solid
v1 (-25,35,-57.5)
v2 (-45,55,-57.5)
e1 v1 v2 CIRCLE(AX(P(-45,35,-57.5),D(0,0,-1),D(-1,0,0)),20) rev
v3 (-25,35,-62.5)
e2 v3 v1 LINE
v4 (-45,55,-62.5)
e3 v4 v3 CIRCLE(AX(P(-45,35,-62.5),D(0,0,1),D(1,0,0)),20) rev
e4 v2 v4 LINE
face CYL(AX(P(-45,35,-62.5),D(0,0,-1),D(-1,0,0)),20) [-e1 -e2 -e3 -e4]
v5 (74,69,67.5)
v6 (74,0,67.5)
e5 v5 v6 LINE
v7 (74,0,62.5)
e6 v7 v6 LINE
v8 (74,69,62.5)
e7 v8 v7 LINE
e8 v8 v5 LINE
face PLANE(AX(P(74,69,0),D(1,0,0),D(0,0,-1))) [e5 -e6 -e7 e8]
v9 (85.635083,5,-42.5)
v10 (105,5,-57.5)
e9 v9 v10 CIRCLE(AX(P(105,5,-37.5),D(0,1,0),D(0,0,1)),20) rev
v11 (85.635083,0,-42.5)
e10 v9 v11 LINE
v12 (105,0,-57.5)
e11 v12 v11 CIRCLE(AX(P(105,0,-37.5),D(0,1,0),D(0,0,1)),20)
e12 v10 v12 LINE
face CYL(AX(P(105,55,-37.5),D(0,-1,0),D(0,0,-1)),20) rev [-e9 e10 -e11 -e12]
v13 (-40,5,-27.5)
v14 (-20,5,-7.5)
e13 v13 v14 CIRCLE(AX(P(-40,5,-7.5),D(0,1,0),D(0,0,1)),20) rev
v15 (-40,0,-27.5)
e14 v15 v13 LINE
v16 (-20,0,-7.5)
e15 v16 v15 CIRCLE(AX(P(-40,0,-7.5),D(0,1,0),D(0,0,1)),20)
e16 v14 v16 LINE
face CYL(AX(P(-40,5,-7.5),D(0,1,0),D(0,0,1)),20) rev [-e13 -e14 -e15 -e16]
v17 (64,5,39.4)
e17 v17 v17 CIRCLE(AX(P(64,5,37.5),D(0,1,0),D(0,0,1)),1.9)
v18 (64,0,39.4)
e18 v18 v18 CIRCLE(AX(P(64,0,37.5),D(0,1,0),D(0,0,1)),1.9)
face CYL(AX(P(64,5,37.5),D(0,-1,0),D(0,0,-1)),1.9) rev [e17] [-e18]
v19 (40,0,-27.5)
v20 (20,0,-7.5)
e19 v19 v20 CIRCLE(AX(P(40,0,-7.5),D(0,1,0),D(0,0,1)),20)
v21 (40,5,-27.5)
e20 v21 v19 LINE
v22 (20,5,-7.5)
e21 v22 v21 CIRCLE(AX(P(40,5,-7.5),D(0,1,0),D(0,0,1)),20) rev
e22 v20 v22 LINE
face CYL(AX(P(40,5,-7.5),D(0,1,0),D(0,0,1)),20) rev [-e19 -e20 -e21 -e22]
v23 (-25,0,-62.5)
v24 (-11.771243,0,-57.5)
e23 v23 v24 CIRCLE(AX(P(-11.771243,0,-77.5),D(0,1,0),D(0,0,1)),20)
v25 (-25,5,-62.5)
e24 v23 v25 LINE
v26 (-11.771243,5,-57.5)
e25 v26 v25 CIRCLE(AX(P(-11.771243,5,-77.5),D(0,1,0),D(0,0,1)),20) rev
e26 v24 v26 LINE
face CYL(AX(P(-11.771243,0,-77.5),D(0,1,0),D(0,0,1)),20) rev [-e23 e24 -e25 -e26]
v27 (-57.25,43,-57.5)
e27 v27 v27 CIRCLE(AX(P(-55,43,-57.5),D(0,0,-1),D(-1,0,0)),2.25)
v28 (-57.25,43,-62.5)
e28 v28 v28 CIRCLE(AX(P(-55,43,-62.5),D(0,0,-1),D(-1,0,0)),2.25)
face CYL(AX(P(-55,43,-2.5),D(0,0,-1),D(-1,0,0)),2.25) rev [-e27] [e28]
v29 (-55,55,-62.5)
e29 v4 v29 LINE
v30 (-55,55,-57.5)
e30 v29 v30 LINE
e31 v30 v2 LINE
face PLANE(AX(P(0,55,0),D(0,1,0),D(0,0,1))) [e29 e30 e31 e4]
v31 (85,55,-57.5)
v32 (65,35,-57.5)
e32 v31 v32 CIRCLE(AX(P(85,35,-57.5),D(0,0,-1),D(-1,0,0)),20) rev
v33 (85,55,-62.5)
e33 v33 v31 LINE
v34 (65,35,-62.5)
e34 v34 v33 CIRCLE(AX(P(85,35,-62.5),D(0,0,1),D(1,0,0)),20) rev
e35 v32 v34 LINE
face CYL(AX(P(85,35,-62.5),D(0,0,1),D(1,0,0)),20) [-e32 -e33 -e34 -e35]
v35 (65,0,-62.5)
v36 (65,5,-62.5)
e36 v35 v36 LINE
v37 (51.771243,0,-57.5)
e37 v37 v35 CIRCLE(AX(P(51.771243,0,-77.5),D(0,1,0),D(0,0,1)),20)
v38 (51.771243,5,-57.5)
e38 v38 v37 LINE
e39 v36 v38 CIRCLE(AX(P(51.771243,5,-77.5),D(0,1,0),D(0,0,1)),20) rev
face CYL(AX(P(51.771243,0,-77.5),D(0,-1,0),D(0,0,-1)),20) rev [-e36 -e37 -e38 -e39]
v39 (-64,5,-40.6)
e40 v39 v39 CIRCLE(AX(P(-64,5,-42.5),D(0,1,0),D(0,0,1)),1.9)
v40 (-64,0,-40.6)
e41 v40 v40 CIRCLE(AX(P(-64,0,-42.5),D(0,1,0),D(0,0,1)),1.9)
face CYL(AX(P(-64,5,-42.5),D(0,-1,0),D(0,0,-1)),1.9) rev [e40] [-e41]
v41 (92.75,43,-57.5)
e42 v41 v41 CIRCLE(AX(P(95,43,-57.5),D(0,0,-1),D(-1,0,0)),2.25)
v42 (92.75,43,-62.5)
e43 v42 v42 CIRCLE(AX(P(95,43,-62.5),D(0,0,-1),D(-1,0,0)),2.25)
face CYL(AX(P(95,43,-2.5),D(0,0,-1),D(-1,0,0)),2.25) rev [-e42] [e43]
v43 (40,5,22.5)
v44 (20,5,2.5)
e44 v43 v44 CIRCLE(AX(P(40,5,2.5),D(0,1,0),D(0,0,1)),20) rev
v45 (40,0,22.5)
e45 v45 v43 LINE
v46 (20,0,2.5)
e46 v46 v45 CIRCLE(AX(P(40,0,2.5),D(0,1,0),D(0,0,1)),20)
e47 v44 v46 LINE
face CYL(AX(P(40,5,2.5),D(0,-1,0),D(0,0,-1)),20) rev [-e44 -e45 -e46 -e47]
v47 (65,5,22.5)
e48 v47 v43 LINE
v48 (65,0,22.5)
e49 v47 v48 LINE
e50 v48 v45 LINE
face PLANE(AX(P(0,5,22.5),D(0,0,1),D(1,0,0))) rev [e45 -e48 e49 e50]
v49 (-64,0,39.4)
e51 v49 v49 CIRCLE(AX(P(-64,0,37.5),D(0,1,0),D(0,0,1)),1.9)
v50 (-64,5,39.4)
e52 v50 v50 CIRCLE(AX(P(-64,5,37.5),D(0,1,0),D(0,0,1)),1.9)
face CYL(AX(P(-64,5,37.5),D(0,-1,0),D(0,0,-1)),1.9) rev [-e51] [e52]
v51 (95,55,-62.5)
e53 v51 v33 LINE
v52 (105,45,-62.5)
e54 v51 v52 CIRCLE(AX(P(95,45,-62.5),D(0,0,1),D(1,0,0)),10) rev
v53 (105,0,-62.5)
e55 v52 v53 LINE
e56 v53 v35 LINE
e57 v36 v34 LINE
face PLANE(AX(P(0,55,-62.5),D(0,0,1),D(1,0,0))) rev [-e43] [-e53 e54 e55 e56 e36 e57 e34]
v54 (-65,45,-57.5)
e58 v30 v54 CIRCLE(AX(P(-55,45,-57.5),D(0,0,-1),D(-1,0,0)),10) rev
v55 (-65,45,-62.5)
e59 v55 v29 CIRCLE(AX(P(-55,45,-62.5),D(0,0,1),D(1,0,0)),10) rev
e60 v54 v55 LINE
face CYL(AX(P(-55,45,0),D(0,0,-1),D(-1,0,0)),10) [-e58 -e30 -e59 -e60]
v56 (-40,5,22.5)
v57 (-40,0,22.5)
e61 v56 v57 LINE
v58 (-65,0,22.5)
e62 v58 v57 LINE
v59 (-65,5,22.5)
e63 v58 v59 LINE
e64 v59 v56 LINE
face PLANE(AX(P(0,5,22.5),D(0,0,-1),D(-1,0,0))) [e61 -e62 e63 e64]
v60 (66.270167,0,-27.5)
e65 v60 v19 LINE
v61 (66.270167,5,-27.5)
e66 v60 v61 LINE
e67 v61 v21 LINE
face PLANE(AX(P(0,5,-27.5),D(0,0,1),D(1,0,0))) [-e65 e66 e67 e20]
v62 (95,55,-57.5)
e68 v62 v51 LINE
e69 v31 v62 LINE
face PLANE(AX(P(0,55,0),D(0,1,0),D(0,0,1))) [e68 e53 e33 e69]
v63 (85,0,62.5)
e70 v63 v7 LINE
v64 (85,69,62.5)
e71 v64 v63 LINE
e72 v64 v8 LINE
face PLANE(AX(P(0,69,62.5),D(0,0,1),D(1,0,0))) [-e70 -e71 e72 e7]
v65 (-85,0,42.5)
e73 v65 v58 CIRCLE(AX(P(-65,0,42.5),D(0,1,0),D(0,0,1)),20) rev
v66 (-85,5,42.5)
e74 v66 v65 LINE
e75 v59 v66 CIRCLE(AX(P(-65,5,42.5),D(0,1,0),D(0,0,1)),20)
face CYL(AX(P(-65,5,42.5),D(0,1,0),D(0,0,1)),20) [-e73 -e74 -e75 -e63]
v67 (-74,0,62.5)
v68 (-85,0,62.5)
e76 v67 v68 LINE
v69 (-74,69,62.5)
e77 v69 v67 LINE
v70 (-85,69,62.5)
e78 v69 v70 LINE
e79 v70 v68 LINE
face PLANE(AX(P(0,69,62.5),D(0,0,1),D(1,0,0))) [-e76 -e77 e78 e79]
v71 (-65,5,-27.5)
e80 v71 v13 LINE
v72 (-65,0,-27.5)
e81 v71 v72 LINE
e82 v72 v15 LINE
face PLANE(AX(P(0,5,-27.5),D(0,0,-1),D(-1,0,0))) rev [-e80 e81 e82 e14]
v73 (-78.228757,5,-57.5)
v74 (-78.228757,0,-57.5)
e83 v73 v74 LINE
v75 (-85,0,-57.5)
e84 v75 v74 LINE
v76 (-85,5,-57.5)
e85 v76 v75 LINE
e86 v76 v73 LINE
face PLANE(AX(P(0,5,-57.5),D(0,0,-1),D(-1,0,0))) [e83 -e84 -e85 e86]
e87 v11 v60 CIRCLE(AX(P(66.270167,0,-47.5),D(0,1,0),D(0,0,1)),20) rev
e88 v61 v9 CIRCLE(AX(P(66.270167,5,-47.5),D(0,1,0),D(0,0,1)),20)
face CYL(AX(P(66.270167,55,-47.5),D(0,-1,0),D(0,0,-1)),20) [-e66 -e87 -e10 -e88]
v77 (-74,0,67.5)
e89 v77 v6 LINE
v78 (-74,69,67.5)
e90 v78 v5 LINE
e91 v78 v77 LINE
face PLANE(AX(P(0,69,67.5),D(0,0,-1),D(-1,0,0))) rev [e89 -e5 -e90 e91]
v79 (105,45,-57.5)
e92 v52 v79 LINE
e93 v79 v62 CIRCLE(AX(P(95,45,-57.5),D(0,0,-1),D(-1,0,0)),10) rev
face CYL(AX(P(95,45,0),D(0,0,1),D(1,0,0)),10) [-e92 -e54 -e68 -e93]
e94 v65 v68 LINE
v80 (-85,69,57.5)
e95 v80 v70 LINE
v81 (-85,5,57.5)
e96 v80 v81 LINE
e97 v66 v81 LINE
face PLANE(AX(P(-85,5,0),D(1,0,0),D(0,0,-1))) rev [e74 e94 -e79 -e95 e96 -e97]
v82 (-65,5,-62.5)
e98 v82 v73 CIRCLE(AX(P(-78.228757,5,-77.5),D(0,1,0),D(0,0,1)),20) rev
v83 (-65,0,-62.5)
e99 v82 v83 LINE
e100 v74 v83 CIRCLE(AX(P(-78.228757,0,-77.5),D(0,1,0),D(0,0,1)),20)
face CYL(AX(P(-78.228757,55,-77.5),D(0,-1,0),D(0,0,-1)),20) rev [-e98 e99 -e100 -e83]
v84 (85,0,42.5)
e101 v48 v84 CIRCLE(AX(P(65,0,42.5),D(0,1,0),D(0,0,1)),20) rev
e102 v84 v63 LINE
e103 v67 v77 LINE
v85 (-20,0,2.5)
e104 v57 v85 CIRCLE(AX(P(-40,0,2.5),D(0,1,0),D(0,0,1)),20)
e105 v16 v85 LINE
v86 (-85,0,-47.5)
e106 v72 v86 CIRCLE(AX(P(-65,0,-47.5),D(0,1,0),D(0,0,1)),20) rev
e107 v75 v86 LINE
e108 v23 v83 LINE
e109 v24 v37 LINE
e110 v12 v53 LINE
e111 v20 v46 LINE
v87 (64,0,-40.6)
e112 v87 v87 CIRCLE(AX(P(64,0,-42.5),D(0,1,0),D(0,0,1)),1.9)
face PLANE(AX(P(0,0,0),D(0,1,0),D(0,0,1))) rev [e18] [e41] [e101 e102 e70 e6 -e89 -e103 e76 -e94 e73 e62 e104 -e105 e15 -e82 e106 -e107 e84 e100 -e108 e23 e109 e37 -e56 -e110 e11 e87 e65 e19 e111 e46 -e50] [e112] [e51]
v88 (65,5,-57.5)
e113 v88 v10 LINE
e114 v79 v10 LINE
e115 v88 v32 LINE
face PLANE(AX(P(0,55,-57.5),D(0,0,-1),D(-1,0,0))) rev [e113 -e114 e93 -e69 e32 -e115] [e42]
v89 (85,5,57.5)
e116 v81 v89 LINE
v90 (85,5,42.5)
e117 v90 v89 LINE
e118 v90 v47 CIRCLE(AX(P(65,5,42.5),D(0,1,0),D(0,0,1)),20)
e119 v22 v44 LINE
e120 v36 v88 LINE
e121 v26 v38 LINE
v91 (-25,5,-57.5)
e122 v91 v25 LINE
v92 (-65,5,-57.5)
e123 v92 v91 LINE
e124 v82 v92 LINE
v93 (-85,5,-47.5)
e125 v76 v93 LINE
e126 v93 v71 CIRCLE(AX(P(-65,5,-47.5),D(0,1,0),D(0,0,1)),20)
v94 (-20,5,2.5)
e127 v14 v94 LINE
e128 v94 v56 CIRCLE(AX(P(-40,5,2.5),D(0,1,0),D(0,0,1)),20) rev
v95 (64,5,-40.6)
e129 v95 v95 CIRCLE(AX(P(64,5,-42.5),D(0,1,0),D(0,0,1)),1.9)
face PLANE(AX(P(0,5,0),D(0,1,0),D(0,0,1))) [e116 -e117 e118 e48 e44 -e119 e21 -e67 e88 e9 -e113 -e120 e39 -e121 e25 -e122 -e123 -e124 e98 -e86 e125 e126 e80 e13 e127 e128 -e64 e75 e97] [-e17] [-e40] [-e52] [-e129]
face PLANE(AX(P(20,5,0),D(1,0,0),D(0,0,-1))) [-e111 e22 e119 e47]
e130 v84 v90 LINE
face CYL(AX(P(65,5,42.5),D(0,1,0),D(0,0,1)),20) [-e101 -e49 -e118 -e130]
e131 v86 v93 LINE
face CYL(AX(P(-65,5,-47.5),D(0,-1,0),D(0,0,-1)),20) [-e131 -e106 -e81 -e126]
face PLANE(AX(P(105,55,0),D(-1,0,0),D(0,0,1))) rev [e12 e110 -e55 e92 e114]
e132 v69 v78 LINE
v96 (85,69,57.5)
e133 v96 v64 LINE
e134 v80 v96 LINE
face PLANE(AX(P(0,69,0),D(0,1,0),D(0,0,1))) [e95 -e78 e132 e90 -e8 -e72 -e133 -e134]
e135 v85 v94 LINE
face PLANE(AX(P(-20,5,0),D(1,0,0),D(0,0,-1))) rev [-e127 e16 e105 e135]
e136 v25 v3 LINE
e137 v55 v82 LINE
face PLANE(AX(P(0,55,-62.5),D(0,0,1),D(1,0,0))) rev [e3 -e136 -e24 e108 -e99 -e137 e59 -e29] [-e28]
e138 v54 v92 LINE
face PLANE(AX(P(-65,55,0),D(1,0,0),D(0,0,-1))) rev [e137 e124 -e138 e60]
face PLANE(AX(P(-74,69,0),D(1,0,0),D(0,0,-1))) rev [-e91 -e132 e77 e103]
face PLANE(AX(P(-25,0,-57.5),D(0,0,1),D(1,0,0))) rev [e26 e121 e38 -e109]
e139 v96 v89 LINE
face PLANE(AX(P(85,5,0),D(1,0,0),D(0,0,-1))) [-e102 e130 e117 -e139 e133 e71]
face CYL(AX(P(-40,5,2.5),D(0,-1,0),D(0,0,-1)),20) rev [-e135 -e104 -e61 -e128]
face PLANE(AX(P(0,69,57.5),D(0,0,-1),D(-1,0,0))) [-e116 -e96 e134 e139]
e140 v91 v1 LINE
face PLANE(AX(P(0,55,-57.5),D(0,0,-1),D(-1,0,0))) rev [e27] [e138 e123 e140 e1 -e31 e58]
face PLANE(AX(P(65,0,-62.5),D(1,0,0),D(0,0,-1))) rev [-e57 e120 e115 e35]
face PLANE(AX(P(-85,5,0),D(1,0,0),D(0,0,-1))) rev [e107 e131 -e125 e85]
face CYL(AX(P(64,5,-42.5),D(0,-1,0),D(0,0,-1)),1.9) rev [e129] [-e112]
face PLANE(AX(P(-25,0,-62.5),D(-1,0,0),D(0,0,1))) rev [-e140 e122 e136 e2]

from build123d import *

# Parameters (mm, degrees)
SKETCH1_R           = 1.9
BOSS_EXTRUDE1_DEPTH = 5
SKETCH1_4_W         = 148
SKETCH1_4_H         = 5
BOSS_EXTRUDE3_DEPTH = 69
SKETCH1_5_W         = 150
SKETCH1_5_H         = 5
SKETCH1_5_W_2       = 20
BOSS_EXTRUDE4_DEPTH = 55
SKETCH2_R           = 2.25
CUT_EXTRUDE1_DEPTH  = 60
FILLET1_R           = 20
FILLET2_R           = 10
SKETCH4_W           = 90
SKETCH4_H           = 5
CUT_EXTRUDE2_DEPTH  = 55
FILLET3_R           = 20


# Some blends are built 0.0001 mm under size
with BuildPart() as part:
    # Sketch1 → Boss-Extrude1 (new body)
    with BuildSketch(Plane(origin=(0, 0, 0), x_dir=(1, 0, 0), z_dir=(0, 1, 0))):
        Polygon((-85, -22.5), (-85, -57.5), (85, -57.5), (85, -22.5), (20, -22.5), (20, 27.5), (85, 27.5), (85, 57.5), (-65, 57.5), (-85, 57.5), (-85, 27.5), (-20, 27.5), (-20, -22.5), align=None)
        with Locations(Location((-64, -37.5, 0), (0, 0, 270))):
            Circle(SKETCH1_R, mode=Mode.SUBTRACT)
        with Locations(Location((64, -37.5, 0), (0, 0, 270))):
            Circle(SKETCH1_R, mode=Mode.SUBTRACT)
        with Locations(Location((-64, 42.5, 0), (0, 0, 270))):
            Circle(SKETCH1_R, mode=Mode.SUBTRACT)
        with Locations(Location((64, 42.5, 0), (0, 0, 270))):
            Circle(SKETCH1_R, mode=Mode.SUBTRACT)
    extrude(amount=BOSS_EXTRUDE1_DEPTH)

    # Sketch1<4> → Boss-Extrude3 (add)
    with BuildSketch(Plane(origin=(0, 0, 0), x_dir=(1, 0, 0), z_dir=(0, 1, 0))):
        with Locations((0, -65)):
            Rectangle(SKETCH1_4_W, SKETCH1_4_H)
        Polygon((85, -57.5), (-85, -57.5), (-85, -62.5), (-74, -62.5), (74, -62.5), (85, -62.5), align=None)
    extrude(amount=BOSS_EXTRUDE3_DEPTH)

    # Sketch1<5> → Boss-Extrude4 (add)
    with BuildSketch(Plane(origin=(0, 0, 0), x_dir=(1, 0, 0), z_dir=(0, 1, 0))):
        with Locations((10, 60)):
            Rectangle(SKETCH1_5_W, SKETCH1_5_H)
        with Locations((95, 60)):
            Rectangle(SKETCH1_5_W_2, SKETCH1_5_H)
    extrude(amount=BOSS_EXTRUDE4_DEPTH)

    # Sketch2 → Cut-Extrude1 (cut)
    with BuildSketch(Plane(origin=(0, 0, -62.5), x_dir=(-1, 0, 0), z_dir=(0, 0, -1))):
        with Locations((-95, 43)):
            Circle(SKETCH2_R)
        with Locations((55, 43)):
            Circle(SKETCH2_R)
    extrude(amount=-CUT_EXTRUDE1_DEPTH, mode=Mode.SUBTRACT)

    # Fillet1
    fillet1_edges = [part.edges().sort_by_distance(p)[0] for p in [
        (85, 2.5, -57.5),
    ]]
    fillet(fillet1_edges, radius=FILLET1_R - 0.0001)  # a hair under: the kernel refuses the full size

    # Fillet2
    fillet2_edges = [part.edges().sort_by_distance(p)[0] for p in [
        (-65, 55, -60),
        (105, 55, -60),
    ]]
    fillet(fillet2_edges, radius=FILLET2_R)

    # Sketch4 → Cut-Extrude2 (cut)
    with BuildSketch(Plane(origin=(0, 55, 0), x_dir=(1, 0, 0), z_dir=(0, 1, 0))):
        with Locations((20, 60)):
            Rectangle(SKETCH4_W, SKETCH4_H)
    extrude(amount=-CUT_EXTRUDE2_DEPTH, mode=Mode.SUBTRACT)

    # Fillet3
    # the kernel refuses this fillet: 20 mm, written as the material it adds along each edge
    with BuildSketch(Plane(origin=(65, 5, -57.5), x_dir=(-1, 0, 0), z_dir=(0, -1, 0))) as fillet3_piece_1:
        with BuildLine():
            CenterArc((13.228756555, 20), FILLET3_R, 228.590377891, 41.409622109)
            Line((0, 5), (0, 0))
            Line((0, 0), (13.228756555, 0))
        make_face()
    extrude(amount=5)
    with BuildSketch(Plane(origin=(-25, 5, -57.5), x_dir=(0, 0, -1), z_dir=(0, -1, 0)), Plane(origin=(-65, 0, -57.5), x_dir=(0, 0, -1), z_dir=(0, 1, 0))) as fillet3_piece_2:
        with BuildLine():
            CenterArc((20, 13.228756555), FILLET3_R, 180, 41.409622109)
            Line((0, 13.228756555), (0, 0))
            Line((0, 0), (5, 0))
        make_face()
    extrude(amount=5)
    with BuildSketch(Plane(origin=(-20, 0, 22.5), x_dir=(-1, 0, 0), z_dir=(0, 1, 0)), Plane(origin=(-20, 0, -27.5), x_dir=(0, 0, 1), z_dir=(0, 1, 0)), Plane(origin=(20, 0, 22.5), x_dir=(0, 0, -1), z_dir=(0, 1, 0)), Plane(origin=(20, 0, -27.5), x_dir=(1, 0, 0), z_dir=(0, 1, 0))) as fillet3_piece_3:
        with BuildLine():
            CenterArc((FILLET3_R, -FILLET3_R), FILLET3_R, 90, 90)
            Line((0, -FILLET3_R), (0, 0))
            Line((0, 0), (FILLET3_R, 0))
        make_face()
    extrude(amount=5)
    # the kernel refuses this fillet: 20 mm, written as the material it takes off along each edge
    with BuildSketch(Plane(origin=(-25, 55, -7.5), x_dir=(0, -1, 0), z_dir=(0, 0, -1)), Plane(origin=(65, 55, -112.5), x_dir=(0, -1, 0), z_dir=(0, 0, 1))) as fillet3_2_piece_1:
        with BuildLine():
            CenterArc((FILLET3_R, FILLET3_R), FILLET3_R, 180, 90)
            Line((0, FILLET3_R), (0, 0))
            Line((0, 0), (FILLET3_R, 0))
        make_face()
    extrude(amount=105, mode=Mode.SUBTRACT)
    with BuildSketch(Plane(origin=(85, -46.824640006, -27.5), x_dir=(0.04230002714791386, 0, -0.999104953297343), z_dir=(0, 1, 0))) as fillet3_2_piece_2:
        with BuildLine():
            CenterArc((19.189825649, 19.559092449), FILLET3_R, 182.42433637, 75.522598767)
            Line((-0.792273417, 18.713091906), (-2.790483324, 18.628491852))
            Line((-2.790483324, 18.628491852), (-1.998209907, -0.084600054))
            Line((-1.998209907, -0.084600054), (0.084600054, -1.998209907))
            ThreePointArc((0.084600054, -1.998209907), (10.075749498, -1.575205405), (14.595840223, -1.955909245))
            Line((14.595840223, -1.955909245), (15.013475262, 0))
        make_face()
    extrude(amount=98.649280012, mode=Mode.SUBTRACT)
    with BuildSketch(Plane(origin=(-85, -50, -27.5), x_dir=(0, 0, -1), z_dir=(0, 1, 0)), Plane(origin=(-85, -50, 22.5), x_dir=(1, 0, 0), z_dir=(0, 1, 0)), Plane(origin=(85, -50, 22.5), x_dir=(0, 0, 1), z_dir=(0, 1, 0))) as fillet3_2_piece_3:
        with BuildLine():
            CenterArc((FILLET3_R, -FILLET3_R), FILLET3_R, 90, 90)
            Line((0, -FILLET3_R), (0, 0))
            Line((0, 0), (FILLET3_R, 0))
        make_face()
    extrude(amount=105, mode=Mode.SUBTRACT)


solid = part.part
